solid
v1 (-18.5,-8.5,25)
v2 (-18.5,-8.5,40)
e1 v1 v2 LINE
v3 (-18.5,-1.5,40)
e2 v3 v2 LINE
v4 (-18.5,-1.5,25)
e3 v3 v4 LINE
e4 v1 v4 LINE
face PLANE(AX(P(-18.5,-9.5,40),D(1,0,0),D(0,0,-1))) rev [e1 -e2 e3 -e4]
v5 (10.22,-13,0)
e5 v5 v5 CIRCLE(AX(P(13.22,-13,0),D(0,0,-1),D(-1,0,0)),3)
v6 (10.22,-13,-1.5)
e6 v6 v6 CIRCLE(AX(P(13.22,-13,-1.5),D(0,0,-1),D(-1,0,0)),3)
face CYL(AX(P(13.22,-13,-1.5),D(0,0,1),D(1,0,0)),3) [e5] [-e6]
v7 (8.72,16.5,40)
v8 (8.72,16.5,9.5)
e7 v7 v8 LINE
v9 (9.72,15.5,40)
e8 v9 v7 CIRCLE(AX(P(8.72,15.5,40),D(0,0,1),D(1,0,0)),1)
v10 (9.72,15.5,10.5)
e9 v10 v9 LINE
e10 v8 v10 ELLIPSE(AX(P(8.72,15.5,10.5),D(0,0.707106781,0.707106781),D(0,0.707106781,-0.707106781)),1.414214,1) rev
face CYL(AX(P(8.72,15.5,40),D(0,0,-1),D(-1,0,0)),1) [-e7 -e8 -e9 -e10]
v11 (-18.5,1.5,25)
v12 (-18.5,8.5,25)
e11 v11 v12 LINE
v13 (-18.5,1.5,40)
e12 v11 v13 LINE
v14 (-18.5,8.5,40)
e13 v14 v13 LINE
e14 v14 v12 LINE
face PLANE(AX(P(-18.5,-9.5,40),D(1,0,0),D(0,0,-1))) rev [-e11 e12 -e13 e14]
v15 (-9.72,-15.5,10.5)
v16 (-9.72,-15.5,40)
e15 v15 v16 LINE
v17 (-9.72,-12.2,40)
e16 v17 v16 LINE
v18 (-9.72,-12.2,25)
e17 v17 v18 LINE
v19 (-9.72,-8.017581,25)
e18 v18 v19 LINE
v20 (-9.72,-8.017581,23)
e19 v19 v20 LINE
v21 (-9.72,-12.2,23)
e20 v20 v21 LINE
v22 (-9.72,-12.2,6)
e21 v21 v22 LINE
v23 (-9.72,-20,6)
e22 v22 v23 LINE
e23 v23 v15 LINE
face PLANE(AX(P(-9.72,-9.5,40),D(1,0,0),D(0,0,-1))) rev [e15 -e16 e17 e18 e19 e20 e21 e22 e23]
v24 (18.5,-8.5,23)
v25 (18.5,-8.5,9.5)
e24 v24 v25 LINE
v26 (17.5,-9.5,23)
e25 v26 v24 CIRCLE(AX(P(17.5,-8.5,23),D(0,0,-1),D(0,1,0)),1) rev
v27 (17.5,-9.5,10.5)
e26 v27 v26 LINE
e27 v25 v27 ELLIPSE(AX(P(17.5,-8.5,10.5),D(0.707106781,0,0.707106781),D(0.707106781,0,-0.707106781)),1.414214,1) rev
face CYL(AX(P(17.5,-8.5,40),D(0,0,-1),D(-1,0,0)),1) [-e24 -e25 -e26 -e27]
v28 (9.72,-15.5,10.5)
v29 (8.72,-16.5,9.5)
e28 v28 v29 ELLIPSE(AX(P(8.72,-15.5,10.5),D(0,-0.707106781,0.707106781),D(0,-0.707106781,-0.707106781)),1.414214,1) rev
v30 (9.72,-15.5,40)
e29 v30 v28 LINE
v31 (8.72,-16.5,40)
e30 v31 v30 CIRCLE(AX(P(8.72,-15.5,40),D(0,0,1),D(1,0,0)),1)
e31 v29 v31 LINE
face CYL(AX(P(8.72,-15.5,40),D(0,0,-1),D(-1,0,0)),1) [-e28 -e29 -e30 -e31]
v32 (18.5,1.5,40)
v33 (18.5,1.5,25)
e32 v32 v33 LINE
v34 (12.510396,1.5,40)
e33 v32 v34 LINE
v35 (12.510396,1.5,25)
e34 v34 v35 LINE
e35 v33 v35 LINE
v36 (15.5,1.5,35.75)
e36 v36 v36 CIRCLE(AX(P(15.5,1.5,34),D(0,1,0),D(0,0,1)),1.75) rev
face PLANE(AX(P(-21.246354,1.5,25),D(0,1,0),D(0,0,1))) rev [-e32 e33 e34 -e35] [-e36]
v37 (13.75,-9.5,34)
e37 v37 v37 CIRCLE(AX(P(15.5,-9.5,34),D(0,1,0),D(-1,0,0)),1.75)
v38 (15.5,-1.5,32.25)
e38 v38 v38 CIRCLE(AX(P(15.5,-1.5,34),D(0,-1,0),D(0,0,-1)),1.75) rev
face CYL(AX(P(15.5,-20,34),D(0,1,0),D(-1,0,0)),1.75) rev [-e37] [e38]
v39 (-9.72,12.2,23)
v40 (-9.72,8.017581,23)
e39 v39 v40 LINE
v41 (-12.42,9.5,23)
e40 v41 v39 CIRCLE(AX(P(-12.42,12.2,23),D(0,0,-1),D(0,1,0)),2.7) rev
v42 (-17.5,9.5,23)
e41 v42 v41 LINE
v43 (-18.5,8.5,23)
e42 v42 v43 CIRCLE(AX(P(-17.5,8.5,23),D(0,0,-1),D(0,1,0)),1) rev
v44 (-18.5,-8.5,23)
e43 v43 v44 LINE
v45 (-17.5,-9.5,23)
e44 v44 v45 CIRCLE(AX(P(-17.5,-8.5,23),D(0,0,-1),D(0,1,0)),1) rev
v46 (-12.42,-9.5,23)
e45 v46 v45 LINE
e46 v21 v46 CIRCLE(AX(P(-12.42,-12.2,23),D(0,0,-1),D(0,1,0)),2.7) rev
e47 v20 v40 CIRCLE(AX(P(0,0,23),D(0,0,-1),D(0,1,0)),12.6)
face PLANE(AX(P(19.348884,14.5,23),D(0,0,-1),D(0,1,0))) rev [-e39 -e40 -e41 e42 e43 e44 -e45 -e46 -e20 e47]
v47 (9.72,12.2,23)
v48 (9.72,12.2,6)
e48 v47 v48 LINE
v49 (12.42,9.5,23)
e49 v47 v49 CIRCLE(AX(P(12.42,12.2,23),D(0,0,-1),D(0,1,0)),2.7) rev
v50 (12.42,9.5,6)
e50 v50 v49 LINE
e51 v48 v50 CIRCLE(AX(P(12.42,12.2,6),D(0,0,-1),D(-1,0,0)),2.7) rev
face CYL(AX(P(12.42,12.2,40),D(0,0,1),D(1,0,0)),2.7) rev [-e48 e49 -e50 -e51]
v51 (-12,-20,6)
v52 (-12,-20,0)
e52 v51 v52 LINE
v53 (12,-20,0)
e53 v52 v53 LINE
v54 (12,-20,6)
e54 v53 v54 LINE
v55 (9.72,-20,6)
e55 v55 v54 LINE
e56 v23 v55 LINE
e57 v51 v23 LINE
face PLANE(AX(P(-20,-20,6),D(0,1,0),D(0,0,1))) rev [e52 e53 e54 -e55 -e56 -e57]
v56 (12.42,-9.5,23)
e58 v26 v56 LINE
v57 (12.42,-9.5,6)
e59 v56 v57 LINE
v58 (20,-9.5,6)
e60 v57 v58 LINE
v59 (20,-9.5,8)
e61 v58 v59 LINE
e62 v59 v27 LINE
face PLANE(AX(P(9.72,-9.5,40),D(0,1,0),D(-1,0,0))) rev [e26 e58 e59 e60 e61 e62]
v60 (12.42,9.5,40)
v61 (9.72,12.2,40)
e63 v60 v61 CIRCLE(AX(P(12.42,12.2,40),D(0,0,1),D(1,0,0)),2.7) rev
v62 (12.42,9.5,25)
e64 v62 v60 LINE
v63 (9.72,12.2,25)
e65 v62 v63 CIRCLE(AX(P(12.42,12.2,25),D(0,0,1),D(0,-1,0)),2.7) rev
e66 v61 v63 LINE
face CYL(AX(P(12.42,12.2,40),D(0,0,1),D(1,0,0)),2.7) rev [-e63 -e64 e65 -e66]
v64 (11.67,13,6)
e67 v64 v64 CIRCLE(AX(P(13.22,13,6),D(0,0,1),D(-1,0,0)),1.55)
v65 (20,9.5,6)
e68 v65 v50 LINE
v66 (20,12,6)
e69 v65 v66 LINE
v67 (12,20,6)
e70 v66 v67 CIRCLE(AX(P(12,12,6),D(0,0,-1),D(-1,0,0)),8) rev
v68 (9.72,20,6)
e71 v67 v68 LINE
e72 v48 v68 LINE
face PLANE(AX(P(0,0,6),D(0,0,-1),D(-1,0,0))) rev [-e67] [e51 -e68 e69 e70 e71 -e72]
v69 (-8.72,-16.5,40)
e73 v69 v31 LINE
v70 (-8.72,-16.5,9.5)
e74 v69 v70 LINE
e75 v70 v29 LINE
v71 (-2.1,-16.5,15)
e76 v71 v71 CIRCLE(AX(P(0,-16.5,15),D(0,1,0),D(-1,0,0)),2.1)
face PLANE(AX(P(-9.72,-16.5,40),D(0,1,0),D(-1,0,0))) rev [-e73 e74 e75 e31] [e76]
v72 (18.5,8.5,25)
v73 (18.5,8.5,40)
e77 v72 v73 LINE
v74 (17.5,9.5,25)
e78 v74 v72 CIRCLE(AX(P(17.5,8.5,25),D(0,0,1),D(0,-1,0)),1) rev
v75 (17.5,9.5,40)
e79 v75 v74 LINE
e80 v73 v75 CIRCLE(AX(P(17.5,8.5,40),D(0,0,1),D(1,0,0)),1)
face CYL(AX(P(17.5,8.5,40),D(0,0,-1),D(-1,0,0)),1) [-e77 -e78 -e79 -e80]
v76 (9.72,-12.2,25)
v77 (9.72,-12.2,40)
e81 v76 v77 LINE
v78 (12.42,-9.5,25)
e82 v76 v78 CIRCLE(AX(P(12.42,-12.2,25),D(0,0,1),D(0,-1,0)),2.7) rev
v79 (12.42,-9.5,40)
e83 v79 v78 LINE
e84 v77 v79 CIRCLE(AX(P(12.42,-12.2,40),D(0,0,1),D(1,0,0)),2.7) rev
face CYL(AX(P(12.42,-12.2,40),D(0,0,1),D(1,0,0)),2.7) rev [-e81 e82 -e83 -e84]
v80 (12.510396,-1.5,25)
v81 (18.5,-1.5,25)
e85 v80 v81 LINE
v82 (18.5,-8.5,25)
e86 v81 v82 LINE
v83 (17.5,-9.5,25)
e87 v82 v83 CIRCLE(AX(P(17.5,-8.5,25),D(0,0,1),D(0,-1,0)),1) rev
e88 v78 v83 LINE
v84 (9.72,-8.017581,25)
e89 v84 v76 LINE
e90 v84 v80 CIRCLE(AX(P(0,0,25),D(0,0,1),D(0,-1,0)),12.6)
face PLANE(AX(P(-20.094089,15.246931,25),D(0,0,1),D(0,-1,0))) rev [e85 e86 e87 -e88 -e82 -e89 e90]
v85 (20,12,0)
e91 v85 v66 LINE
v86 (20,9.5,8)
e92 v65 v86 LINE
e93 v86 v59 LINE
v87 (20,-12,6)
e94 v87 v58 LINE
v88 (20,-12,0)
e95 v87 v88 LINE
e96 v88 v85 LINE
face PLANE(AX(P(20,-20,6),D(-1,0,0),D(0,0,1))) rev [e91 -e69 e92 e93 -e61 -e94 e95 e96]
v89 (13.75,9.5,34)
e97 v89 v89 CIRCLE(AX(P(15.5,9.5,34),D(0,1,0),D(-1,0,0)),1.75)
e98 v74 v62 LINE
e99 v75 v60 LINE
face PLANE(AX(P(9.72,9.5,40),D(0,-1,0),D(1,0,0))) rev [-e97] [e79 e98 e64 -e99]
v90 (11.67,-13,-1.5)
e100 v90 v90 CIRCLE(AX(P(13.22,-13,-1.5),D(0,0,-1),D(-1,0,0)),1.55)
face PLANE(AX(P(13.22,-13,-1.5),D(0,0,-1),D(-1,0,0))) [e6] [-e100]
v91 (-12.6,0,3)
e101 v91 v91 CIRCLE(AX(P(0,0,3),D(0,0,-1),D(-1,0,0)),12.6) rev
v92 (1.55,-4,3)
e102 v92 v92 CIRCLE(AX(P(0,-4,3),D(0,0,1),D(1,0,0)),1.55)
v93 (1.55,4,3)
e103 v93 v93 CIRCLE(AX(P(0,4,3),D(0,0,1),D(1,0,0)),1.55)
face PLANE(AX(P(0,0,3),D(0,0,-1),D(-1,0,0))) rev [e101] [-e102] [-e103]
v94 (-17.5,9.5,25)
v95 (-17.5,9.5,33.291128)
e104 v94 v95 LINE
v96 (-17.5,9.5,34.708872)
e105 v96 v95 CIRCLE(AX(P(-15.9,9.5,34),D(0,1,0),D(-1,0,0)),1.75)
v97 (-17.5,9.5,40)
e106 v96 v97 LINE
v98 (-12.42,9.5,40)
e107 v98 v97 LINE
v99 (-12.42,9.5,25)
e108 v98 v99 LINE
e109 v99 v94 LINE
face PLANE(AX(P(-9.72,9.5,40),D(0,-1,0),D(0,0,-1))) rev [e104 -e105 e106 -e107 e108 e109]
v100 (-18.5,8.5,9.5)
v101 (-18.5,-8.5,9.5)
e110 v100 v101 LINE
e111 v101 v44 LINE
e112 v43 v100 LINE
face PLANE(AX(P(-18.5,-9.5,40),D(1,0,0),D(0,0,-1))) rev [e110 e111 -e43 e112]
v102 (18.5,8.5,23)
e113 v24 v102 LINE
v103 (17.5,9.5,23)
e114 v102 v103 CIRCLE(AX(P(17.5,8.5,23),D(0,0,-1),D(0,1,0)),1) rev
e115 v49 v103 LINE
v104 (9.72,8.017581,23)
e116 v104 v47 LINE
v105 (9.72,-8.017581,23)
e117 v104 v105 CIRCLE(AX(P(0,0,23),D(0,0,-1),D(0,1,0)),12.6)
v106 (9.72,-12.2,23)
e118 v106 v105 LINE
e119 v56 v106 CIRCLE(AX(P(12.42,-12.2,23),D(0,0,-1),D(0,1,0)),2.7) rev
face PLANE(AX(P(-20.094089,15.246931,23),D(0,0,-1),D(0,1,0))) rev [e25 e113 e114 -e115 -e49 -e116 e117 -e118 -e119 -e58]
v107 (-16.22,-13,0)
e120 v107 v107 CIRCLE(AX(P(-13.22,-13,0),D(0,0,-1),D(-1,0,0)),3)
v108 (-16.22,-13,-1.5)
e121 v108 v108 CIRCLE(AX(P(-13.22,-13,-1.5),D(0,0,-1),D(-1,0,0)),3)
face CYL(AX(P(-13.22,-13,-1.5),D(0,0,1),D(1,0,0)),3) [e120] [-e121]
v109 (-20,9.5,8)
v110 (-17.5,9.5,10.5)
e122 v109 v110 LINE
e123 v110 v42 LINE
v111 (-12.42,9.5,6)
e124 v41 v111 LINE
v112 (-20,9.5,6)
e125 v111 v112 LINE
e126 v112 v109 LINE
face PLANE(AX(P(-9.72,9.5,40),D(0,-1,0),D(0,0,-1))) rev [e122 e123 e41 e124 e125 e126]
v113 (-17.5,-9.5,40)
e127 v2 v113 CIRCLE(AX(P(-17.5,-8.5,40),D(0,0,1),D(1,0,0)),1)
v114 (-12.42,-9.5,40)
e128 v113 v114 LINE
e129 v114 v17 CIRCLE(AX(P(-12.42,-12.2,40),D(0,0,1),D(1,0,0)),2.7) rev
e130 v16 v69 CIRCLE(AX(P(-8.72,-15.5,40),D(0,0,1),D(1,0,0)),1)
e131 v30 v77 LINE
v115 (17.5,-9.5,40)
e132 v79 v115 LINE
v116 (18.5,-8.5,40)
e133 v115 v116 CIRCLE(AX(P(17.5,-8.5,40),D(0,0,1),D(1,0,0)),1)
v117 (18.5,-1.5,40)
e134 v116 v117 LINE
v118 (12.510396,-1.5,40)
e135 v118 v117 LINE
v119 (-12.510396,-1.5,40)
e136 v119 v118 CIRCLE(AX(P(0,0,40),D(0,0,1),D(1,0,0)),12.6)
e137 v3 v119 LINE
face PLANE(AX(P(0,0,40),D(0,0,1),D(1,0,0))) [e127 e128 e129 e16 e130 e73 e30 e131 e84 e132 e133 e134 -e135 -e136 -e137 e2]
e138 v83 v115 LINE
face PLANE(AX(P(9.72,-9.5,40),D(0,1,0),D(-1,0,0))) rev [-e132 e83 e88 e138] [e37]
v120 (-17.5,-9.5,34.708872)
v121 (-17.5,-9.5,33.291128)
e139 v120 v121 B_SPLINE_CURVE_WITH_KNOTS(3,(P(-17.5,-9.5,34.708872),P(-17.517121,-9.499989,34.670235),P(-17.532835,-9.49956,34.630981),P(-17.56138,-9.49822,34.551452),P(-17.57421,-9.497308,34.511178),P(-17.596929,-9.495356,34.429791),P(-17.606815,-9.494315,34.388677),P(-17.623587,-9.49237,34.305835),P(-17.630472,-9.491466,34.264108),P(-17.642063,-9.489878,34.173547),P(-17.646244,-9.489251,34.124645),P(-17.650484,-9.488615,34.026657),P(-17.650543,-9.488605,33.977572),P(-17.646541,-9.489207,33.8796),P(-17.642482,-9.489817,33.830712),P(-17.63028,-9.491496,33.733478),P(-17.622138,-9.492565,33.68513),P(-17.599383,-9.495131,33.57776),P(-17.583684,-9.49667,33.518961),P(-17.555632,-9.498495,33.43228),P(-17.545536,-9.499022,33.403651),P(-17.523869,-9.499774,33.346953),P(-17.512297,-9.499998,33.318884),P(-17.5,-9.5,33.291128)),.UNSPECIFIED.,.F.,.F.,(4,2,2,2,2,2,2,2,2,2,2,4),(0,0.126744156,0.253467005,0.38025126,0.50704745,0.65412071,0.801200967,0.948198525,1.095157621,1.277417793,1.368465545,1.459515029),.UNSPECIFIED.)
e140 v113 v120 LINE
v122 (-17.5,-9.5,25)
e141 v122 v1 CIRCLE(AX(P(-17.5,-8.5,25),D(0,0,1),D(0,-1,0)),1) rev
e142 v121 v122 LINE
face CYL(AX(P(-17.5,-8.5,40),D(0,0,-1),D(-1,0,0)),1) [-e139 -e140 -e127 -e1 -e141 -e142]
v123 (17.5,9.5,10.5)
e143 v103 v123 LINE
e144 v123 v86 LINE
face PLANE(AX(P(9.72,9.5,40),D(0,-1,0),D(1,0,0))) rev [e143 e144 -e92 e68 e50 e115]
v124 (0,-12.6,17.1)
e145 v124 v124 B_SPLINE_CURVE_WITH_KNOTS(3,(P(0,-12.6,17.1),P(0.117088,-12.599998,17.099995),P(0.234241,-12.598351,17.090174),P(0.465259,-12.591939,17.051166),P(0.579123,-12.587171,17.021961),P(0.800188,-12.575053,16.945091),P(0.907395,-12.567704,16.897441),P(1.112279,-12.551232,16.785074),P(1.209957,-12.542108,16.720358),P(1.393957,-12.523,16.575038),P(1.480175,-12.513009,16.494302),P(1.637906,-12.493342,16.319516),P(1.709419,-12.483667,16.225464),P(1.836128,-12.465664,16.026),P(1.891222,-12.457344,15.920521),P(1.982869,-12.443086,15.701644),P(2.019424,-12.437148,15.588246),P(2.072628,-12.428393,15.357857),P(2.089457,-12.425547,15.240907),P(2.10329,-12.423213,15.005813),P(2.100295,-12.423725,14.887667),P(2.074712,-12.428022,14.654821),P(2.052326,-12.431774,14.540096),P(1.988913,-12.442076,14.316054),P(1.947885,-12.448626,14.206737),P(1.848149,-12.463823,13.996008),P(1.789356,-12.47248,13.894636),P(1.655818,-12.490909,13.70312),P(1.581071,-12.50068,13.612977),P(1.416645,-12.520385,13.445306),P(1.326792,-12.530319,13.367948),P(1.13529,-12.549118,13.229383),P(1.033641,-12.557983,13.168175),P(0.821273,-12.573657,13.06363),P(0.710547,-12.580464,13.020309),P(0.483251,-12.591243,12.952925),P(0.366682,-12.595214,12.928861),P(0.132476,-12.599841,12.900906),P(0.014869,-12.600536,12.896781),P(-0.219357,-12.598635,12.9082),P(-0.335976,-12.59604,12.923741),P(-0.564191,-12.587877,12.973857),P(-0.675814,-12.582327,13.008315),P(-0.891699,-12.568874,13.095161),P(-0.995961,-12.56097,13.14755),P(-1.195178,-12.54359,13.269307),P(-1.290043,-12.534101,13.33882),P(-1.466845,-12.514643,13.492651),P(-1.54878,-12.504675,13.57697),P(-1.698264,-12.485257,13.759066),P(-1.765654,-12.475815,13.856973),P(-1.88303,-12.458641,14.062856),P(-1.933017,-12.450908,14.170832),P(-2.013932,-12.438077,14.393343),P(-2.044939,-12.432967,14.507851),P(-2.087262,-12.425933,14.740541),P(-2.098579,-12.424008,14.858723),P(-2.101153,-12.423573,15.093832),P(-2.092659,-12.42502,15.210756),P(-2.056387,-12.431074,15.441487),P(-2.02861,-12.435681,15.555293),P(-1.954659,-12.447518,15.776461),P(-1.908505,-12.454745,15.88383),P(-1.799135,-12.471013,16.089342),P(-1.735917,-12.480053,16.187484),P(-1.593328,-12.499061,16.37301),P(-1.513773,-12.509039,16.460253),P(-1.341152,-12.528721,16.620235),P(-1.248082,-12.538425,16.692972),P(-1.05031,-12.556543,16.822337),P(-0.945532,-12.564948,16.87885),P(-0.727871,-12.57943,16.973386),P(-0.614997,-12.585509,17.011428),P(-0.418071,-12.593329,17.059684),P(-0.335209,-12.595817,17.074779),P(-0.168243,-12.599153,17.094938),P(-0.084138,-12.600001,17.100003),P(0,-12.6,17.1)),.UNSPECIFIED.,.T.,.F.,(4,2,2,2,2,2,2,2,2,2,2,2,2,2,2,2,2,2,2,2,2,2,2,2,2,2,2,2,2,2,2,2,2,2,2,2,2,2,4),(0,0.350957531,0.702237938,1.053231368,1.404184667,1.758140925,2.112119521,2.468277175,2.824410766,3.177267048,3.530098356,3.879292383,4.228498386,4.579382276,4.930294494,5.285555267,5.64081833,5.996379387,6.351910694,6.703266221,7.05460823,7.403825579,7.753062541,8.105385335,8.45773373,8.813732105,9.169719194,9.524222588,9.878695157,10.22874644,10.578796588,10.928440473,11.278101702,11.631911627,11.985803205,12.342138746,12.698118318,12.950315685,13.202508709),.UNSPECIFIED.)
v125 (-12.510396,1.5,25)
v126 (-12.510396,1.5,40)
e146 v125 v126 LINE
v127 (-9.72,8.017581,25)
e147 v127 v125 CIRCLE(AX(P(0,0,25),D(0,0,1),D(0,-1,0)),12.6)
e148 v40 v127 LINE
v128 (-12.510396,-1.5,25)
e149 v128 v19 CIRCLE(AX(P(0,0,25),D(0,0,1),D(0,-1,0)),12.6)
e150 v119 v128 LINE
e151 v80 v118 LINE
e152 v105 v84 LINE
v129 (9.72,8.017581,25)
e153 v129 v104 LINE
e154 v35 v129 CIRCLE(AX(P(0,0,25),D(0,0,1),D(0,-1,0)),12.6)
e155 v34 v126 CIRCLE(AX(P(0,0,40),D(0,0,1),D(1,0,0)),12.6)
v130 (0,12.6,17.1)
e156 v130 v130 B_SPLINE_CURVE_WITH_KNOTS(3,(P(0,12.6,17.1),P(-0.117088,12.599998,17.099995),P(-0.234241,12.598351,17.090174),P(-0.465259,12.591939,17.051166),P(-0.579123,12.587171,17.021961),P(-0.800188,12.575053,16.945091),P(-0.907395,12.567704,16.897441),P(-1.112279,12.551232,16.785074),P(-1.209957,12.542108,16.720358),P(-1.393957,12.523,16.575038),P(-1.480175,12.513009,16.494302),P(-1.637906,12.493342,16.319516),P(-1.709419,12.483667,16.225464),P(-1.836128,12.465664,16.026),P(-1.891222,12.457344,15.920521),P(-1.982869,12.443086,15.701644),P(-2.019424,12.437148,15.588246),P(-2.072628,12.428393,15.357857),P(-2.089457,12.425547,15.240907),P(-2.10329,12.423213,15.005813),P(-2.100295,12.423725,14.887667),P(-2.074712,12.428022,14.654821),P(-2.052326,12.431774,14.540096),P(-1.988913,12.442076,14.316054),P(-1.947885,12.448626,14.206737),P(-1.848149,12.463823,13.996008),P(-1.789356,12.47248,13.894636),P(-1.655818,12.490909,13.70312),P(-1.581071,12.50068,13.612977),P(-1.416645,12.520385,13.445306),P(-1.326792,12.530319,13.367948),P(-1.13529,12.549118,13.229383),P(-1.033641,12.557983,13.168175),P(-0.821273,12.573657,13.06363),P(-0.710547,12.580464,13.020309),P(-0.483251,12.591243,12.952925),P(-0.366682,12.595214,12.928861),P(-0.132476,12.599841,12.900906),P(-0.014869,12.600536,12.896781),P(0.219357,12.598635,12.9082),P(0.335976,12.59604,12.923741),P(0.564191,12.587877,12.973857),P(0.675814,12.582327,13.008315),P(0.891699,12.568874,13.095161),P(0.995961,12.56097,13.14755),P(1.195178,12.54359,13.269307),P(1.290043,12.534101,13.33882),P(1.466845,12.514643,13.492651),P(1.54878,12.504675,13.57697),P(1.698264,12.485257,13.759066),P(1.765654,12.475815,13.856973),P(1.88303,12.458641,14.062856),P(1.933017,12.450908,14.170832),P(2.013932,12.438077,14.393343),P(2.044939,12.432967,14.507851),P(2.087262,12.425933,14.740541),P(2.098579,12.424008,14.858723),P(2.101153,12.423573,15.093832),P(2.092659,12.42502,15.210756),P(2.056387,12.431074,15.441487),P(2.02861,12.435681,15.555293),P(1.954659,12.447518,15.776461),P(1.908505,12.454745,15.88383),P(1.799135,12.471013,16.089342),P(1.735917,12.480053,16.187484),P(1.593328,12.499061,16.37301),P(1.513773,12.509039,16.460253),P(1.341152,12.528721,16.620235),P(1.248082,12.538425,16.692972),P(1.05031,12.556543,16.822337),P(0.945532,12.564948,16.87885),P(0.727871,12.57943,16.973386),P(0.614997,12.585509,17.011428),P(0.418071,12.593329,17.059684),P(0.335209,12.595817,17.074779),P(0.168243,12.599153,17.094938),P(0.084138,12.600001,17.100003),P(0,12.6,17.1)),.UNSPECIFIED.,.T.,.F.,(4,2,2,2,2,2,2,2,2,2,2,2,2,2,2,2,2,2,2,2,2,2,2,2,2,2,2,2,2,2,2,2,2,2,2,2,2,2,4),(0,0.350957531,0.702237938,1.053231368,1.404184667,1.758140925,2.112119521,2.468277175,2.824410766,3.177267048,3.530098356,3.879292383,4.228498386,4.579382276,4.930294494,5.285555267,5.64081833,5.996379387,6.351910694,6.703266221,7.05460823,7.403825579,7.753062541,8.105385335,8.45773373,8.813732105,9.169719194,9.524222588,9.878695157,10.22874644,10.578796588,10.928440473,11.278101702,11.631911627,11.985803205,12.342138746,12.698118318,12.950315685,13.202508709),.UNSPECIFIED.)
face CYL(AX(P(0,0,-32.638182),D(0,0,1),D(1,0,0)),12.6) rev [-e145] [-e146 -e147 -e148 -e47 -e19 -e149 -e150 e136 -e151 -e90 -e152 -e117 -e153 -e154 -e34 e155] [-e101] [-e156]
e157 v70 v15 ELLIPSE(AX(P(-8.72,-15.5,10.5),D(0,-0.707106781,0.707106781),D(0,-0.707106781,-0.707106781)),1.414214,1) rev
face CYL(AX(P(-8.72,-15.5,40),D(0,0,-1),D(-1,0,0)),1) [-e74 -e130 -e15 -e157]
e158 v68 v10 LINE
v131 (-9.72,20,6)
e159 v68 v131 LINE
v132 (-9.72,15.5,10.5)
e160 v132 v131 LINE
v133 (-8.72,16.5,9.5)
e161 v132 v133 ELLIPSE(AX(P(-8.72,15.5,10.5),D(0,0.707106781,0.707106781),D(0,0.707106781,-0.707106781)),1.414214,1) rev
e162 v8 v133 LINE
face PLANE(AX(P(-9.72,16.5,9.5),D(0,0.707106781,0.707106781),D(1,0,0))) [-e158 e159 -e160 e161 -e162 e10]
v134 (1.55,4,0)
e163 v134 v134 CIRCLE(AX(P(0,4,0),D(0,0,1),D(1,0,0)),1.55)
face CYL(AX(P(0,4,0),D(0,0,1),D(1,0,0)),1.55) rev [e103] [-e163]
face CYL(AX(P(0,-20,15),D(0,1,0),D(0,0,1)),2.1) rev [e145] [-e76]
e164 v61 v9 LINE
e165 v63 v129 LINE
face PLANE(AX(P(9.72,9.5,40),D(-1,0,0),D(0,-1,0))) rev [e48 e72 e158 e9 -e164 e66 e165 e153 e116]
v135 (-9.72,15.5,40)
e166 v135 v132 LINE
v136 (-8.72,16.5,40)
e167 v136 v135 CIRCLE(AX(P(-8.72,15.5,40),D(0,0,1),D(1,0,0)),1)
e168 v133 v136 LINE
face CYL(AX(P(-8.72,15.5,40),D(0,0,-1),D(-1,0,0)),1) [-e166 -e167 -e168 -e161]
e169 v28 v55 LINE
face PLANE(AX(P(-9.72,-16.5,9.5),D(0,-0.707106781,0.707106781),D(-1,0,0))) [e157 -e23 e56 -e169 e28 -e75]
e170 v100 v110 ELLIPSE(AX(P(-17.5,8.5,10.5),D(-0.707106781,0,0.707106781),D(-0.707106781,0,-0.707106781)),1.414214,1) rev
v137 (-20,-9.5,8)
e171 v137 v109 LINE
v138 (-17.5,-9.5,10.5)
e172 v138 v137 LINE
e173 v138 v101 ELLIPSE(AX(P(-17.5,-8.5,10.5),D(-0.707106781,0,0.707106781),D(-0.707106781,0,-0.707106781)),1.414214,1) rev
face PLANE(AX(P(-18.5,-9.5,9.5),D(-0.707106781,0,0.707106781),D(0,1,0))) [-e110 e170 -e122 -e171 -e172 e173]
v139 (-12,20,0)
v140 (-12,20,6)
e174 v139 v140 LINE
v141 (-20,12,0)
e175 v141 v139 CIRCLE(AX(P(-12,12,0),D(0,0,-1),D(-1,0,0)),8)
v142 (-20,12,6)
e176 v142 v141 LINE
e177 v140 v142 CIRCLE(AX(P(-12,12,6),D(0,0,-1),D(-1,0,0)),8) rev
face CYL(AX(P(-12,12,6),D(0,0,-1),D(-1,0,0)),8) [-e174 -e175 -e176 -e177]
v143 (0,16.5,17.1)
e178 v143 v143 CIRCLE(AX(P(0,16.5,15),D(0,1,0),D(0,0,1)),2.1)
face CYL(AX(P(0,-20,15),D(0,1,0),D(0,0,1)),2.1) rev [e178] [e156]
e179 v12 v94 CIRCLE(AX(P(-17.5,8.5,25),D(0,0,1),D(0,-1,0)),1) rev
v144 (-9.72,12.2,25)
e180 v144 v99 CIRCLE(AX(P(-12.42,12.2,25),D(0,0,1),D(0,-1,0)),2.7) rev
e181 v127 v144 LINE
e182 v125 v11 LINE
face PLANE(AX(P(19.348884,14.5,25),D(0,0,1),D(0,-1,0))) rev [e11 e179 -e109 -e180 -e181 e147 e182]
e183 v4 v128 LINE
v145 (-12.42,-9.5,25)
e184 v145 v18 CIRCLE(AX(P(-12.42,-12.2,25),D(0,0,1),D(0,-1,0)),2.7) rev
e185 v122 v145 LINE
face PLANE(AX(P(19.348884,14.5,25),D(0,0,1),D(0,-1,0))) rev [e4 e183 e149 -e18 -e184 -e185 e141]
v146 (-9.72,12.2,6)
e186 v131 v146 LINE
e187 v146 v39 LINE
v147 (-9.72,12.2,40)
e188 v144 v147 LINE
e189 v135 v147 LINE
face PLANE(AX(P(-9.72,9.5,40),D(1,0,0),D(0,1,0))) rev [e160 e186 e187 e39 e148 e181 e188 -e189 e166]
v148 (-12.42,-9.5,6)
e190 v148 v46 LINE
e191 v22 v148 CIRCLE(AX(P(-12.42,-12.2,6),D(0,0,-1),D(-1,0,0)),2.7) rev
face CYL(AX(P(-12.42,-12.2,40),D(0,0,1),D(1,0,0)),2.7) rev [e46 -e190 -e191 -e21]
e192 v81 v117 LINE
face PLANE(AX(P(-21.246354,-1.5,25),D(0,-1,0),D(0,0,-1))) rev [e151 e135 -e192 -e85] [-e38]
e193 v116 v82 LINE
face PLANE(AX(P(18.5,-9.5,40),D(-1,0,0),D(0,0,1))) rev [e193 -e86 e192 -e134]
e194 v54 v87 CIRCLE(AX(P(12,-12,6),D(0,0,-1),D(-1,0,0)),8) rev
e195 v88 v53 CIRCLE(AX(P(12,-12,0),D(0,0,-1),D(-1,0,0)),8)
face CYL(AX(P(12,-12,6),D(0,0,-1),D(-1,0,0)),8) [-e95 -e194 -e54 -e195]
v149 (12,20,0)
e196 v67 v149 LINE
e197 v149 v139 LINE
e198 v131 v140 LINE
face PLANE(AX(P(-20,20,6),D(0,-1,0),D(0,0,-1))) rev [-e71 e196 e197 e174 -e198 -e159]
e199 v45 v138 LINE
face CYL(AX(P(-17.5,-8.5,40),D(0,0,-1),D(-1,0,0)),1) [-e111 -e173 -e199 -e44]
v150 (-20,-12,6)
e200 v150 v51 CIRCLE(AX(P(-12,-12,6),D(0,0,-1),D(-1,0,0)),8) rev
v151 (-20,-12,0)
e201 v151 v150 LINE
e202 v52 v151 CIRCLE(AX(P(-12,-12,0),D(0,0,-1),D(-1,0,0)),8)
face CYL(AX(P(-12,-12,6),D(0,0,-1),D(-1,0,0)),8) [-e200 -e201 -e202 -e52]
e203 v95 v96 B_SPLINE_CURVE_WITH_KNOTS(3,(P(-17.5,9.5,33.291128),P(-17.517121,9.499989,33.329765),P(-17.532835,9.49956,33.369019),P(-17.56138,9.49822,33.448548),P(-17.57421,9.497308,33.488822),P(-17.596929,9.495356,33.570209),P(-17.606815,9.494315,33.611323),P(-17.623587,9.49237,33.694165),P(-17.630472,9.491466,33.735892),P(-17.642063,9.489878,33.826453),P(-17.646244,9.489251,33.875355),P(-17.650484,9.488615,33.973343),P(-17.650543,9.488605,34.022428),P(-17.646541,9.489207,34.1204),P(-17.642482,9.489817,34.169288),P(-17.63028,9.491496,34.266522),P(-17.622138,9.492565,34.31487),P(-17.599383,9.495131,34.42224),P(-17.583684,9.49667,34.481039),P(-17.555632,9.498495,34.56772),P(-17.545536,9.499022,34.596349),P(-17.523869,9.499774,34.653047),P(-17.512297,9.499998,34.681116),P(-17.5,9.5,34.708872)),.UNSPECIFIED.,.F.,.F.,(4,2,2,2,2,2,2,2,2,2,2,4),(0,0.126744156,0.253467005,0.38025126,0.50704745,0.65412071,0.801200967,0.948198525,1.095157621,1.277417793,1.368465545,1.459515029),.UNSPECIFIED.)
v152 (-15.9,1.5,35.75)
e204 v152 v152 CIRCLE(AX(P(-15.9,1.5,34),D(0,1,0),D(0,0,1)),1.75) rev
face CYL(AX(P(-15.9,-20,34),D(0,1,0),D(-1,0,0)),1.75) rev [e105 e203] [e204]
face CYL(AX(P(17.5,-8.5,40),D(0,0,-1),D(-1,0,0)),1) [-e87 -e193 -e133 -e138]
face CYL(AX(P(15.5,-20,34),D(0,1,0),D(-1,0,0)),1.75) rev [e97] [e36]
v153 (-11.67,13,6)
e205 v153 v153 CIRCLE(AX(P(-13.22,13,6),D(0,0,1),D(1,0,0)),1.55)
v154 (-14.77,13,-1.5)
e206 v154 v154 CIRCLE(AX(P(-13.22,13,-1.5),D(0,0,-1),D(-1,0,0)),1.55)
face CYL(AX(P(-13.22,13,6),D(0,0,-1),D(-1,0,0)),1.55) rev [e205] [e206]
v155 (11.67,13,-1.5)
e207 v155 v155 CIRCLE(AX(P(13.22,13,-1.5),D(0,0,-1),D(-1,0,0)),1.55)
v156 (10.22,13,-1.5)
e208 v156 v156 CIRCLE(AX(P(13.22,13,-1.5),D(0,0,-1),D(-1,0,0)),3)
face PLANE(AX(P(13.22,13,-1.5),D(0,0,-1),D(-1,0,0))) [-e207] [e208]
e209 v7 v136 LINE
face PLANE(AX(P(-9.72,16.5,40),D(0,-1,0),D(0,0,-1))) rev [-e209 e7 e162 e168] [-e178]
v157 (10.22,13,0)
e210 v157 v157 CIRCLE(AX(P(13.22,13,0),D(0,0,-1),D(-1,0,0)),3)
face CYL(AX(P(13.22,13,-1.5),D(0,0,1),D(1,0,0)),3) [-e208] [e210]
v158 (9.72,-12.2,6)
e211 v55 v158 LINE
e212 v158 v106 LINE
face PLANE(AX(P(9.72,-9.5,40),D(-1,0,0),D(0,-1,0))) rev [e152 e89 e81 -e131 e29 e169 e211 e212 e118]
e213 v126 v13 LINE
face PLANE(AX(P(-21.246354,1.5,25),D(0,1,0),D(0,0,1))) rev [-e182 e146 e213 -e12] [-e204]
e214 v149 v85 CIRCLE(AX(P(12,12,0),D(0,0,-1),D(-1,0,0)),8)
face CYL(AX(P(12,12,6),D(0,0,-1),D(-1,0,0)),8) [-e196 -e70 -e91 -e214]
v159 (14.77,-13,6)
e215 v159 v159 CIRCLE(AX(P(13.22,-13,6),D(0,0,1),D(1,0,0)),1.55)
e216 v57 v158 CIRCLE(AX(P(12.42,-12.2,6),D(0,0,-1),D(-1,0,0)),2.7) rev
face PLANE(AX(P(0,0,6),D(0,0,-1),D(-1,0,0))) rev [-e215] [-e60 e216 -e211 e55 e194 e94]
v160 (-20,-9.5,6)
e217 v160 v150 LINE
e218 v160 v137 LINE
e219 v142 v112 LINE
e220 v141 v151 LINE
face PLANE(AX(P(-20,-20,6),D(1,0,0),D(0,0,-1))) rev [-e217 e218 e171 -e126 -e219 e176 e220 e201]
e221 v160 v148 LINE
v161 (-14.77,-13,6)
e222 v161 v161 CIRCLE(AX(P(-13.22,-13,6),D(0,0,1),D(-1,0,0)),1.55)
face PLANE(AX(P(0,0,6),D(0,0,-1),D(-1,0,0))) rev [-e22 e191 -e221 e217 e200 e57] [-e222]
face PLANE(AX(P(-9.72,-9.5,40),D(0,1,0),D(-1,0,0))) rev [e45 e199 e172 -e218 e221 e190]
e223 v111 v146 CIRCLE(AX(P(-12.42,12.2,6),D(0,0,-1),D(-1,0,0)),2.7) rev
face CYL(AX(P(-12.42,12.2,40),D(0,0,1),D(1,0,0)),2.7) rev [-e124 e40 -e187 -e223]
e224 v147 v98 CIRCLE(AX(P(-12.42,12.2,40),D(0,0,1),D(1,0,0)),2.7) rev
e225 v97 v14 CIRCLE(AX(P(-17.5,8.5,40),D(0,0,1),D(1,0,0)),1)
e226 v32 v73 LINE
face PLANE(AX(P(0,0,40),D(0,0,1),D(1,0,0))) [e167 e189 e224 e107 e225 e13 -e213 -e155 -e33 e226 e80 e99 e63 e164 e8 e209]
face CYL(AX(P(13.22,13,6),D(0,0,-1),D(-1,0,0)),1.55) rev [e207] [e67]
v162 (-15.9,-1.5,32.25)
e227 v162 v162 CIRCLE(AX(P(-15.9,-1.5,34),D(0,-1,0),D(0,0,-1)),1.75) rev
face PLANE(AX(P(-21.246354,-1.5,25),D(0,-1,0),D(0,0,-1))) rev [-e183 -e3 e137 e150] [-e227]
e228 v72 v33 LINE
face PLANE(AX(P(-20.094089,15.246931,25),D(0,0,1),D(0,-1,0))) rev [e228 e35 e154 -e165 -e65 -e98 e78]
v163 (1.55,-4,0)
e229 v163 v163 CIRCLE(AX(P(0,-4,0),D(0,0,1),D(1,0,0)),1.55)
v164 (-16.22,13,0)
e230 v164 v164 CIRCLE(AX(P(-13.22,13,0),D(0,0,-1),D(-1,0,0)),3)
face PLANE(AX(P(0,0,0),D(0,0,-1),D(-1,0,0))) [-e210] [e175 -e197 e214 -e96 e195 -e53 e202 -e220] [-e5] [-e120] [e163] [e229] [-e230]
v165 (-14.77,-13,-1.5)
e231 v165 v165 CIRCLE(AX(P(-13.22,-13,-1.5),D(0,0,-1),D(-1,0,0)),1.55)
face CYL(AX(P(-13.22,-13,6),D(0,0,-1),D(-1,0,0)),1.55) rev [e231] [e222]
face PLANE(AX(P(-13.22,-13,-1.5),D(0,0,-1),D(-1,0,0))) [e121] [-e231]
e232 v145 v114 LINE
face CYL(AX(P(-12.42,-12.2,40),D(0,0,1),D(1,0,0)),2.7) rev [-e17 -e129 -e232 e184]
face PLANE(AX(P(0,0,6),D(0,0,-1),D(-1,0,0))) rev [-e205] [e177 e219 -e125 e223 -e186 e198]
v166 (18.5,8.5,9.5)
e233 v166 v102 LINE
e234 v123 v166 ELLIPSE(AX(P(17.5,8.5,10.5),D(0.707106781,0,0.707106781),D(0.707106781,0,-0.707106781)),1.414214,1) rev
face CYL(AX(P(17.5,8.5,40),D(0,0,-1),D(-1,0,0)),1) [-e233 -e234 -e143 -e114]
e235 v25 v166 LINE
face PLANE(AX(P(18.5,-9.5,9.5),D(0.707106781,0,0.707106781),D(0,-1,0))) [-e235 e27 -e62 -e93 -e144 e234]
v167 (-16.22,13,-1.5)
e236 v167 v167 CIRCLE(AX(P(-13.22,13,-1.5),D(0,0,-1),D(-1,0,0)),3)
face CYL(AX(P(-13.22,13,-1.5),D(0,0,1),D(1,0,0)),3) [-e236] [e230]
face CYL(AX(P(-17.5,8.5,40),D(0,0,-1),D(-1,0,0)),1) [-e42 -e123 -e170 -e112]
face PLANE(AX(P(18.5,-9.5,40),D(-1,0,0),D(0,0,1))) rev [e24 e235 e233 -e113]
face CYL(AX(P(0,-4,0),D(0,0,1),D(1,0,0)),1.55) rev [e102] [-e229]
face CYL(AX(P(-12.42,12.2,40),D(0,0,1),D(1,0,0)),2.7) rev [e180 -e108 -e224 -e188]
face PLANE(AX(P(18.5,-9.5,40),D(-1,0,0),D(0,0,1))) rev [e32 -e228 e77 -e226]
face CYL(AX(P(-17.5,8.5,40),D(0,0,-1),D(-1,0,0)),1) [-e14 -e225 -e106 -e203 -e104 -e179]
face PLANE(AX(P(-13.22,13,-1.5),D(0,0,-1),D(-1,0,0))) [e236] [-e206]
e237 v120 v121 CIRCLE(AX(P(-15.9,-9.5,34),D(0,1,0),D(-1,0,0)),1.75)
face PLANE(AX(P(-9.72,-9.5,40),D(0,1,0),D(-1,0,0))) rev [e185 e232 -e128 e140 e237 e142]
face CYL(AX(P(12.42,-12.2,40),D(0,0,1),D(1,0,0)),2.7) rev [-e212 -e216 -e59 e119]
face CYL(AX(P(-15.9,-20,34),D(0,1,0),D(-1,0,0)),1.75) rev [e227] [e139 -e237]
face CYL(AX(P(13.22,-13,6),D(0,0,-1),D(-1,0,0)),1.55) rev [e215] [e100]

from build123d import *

# Parameters (mm, degrees)
SKETCH_1_W          = 40
SKETCH_1_H          = 40
SKETCH_1_R          = 1.55
SKETCH_1_R_2        = 12.5
EXTRUDE_1_DEPTH     = 6
SKETCH_2_R          = 12.5
EXTRUDE_2_DEPTH     = 34
SKETCH_4_R          = 1.75
CUT_EXTRUDE_1_DEPTH = 54.574714185
CHAMFER_1_SIZE      = 3.5
CHAMFER_2_SIZE      = 3.5
FILLET_3_R          = 2.7
FILLET_4_R          = 8
SKETCH_5_R          = 12.5
EXTRUDE_3_DEPTH     = 3
SKETCH_6_R          = 1.55
CUT_EXTRUDE_2_DEPTH = 47.572524089
EXTRUDE_START       = 1.5
SKETCH_8_R          = 3
SKETCH_8_R_2        = 1.55
EXTRUDE_4_DEPTH     = 1.5
SKETCH_9_W          = 44.762954336
SKETCH_9_H          = 3
CUT_EXTRUDE_3_DEPTH = 15
CUT_EXTRUDE_4_REACH = 61.011
SKETCH_10_W         = 2
SKETCH_10_H         = 29
SKETCH_11_W         = 2
SKETCH_11_H         = 29.746931438
CUT_EXTRUDE_5_DEPTH = 8.78
FILLET_5_R          = 1
SKETCH_12_R         = 2.1
CUT_EXTRUDE_6_DEPTH = 58.725644284
CUT_EXTRUDE_7_REACH = 52.222
SKETCH_14_R         = 12.6


# Some blends are built 0.0001 mm under size
with BuildPart() as part:
    # 草图1 → 凸台-拉伸1 (new body)
    with BuildSketch(Plane.XY):
        Rectangle(SKETCH_1_W, SKETCH_1_H)
        with Locations((-13.22, 13)):
            Circle(SKETCH_1_R, mode=Mode.SUBTRACT)
        Circle(SKETCH_1_R_2, mode=Mode.SUBTRACT)
        with Locations(Location((13.22, 13, 0), (0, 0, 180))):
            Circle(SKETCH_1_R, mode=Mode.SUBTRACT)
        with Locations((13.22, -13)):
            Circle(SKETCH_1_R, mode=Mode.SUBTRACT)
        with Locations(Location((-13.22, -13, 0), (0, 0, 180))):
            Circle(SKETCH_1_R, mode=Mode.SUBTRACT)
    extrude(amount=EXTRUDE_1_DEPTH)

    # 草图2 → 凸台-拉伸2 (add)
    with BuildSketch(Plane.XY.offset(6)):
        Polygon((-9.72, 9.5), (-9.72, 16.5), (9.72, 16.5), (9.72, 9.5), (18.5, 9.5), (18.5, -9.5), (9.72, -9.5), (9.72, -16.5), (-9.72, -16.5), (-9.72, -9.5), (-18.5, -9.5), (-18.5, 9.5), align=None)
        Circle(SKETCH_2_R, mode=Mode.SUBTRACT)
    extrude(amount=EXTRUDE_2_DEPTH)

    # 草图4 → 切除-拉伸1 (cut, through all)
    with BuildSketch(Plane(origin=(0, 9.5, 0), x_dir=(1, 0, 0), z_dir=(0, 1, 0))):
        with Locations(Location((-15.9, -34, 0), (0, 0, 180))):
            Circle(SKETCH_4_R)
        with Locations(Location((15.5, -34, 0), (0, 0, 180))):
            Circle(SKETCH_4_R)
    extrude(amount=-CUT_EXTRUDE_1_DEPTH, mode=Mode.SUBTRACT)

    # 倒角1
    chamfer_1_edges = [part.edges().sort_by_distance(p)[0] for p in [
        (0, 16.5, 6),
        (0, -16.5, 6),
    ]]
    chamfer(chamfer_1_edges, length=CHAMFER_1_SIZE - 0.0001)  # a hair under: the kernel refuses the full size

    # 倒角2
    # the kernel refuses this chamfer: 3.5 mm, written as the material it adds along each edge
    with BuildSketch(Plane(origin=(-18.5, -9.5, 6), x_dir=(-0.9996219169112968, 0, -0.027495876610586372), z_dir=(0, 1, 0))) as chamfer_2_piece_1_section:
        Polygon((CHAMFER_2_SIZE * 0.999621916911, CHAMFER_2_SIZE * 0.0274958766106), (-CHAMFER_2_SIZE * 0.0274958766106, CHAMFER_2_SIZE * 0.999621916911), (0, 0), align=None)
    chamfer_2_piece_1 = extrude(amount=19, mode=Mode.PRIVATE)
    chamfer_2_piece_1 = split(chamfer_2_piece_1, bisect_by=Plane(origin=(-20, 0, 7.427398354), z_dir=(1, 0, 0)), keep=Keep.TOP, mode=Mode.PRIVATE)
    add(chamfer_2_piece_1)
    with BuildSketch(Plane(origin=(18.5, 9.5, 6), x_dir=(0.9996219169112968, 0, -0.027495876610586372), z_dir=(0, -1, 0))) as chamfer_2_piece_2_section:
        Polygon((CHAMFER_2_SIZE * 0.999621916911, CHAMFER_2_SIZE * 0.0274958766106), (-CHAMFER_2_SIZE * 0.0274958766106, CHAMFER_2_SIZE * 0.999621916911), (0, 0), align=None)
    chamfer_2_piece_2 = extrude(amount=19, mode=Mode.PRIVATE)
    chamfer_2_piece_2 = split(chamfer_2_piece_2, bisect_by=Plane(origin=(20, 0, 7.427398354), z_dir=(-1, 0, 0)), keep=Keep.TOP, mode=Mode.PRIVATE)
    add(chamfer_2_piece_2)

    # 圆角3
    fillet_3_edges = [part.edges().sort_by_distance(p)[0] for p in [
        (9.72, 9.5, 23),
        (-9.72, 9.5, 23),
        (-9.72, -9.5, 23),
        (9.72, -9.5, 23),
    ]]
    fillet(fillet_3_edges, radius=FILLET_3_R)

    # 圆角4
    fillet_4_edges = [part.edges().sort_by_distance(p)[0] for p in [
        (20, -20, 3),
        (-20, -20, 3),
        (-20, 20, 3),
        (20, 20, 3),
    ]]
    fillet(fillet_4_edges, radius=FILLET_4_R)

    # 草图5 → 凸台-拉伸3 (add)
    with BuildSketch(Plane(origin=(0, 0, 0), x_dir=(-1, 0, 0), z_dir=(0, 0, -1))):
        Circle(SKETCH_5_R)
    extrude(amount=-EXTRUDE_3_DEPTH)

    # 草图6 → 切除-拉伸2 (cut, through all)
    with BuildSketch(Plane.XY.offset(3)):
        with Locations((0, 4)):
            Circle(SKETCH_6_R)
        with Locations((0, -4)):
            Circle(SKETCH_6_R)
    extrude(amount=-CUT_EXTRUDE_2_DEPTH, mode=Mode.SUBTRACT)

    # 草图8 → 凸台-拉伸4 (add)
    # profile 1 of 4: a face of its own
    with BuildSketch(Plane(origin=(0, 0, 0), x_dir=(-1, 0, 0), z_dir=(0, 0, -1)).offset(EXTRUDE_START)):
        with Locations((-13.22, 13)):
            Circle(SKETCH_8_R)
        with Locations((-13.22, 13)):
            Circle(SKETCH_8_R_2, mode=Mode.SUBTRACT)
    # profile 2 of 4: a face of its own
    with BuildSketch(Plane(origin=(0, 0, 0), x_dir=(-1, 0, 0), z_dir=(0, 0, -1)).offset(EXTRUDE_START)):
        with Locations((13.22, 13)):
            Circle(SKETCH_8_R)
        with Locations((13.22, 13)):
            Circle(SKETCH_8_R_2, mode=Mode.SUBTRACT)
    # profile 3 of 4: a face of its own
    with BuildSketch(Plane(origin=(0, 0, 0), x_dir=(-1, 0, 0), z_dir=(0, 0, -1)).offset(EXTRUDE_START)):
        with Locations((-13.22, -13)):
            Circle(SKETCH_8_R)
        with Locations((-13.22, -13)):
            Circle(SKETCH_8_R_2, mode=Mode.SUBTRACT)
    # profile 4 of 4: a face of its own
    with BuildSketch(Plane(origin=(0, 0, 0), x_dir=(-1, 0, 0), z_dir=(0, 0, -1)).offset(EXTRUDE_START)):
        with Locations((13.22, -13)):
            Circle(SKETCH_8_R)
        with Locations((13.22, -13)):
            Circle(SKETCH_8_R_2, mode=Mode.SUBTRACT)
    extrude(amount=-EXTRUDE_4_DEPTH)

    # 草图9 → 切除-拉伸3 (cut)
    with BuildSketch(Plane.XY.offset(40)):
        with Locations((1.135123066, 0)):
            Rectangle(SKETCH_9_W, SKETCH_9_H)
    extrude(amount=-CUT_EXTRUDE_3_DEPTH, mode=Mode.SUBTRACT)

    # 切除-拉伸4: up to this face of the body (flat: up to its plane)
    cut_extrude_4_end = Plane(part.part.faces().sort_by_distance((-9.72, 14.483354768, 22.363374022))[0])
    # 草图10 → 切除-拉伸4 (cut, up to the picked face)
    with BuildSketch(Plane.ZY.offset(18.5), mode=Mode.PRIVATE) as cut_extrude_4_sk1:
        with Locations((24, 0)):
            Rectangle(SKETCH_10_W, SKETCH_10_H)
    cut_extrude_4_tool1 = split(extrude(cut_extrude_4_sk1.sketch, amount=-CUT_EXTRUDE_4_REACH, mode=Mode.PRIVATE), bisect_by=cut_extrude_4_end, keep=Keep.BOTH, mode=Mode.PRIVATE)
    add(cut_extrude_4_tool1.solids().sort_by(Axis((-18.5, 0, 24), (1, 0, 0)))[0], mode=Mode.SUBTRACT)

    # 草图11 → 切除-拉伸5 (cut)
    with BuildSketch(Plane(origin=(18.5, 0, 0), x_dir=(0, 0, -1), z_dir=(1, 0, 0))):
        with Locations((-24, 0.373465719)):
            Rectangle(SKETCH_11_W, SKETCH_11_H)
    extrude(amount=-CUT_EXTRUDE_5_DEPTH, mode=Mode.SUBTRACT)

    # 圆角5
    # the kernel refuses this fillet: 1 mm, written as the material it takes off along each edge
    with BuildSketch(Plane(origin=(-18.5, -9.5, 7), x_dir=(1, 0, 0), z_dir=(0, 0, 1))) as fillet_5_piece_1_section:
        with BuildLine():
            CenterArc((FILLET_5_R, FILLET_5_R), FILLET_5_R, 180, 90)
            Line((0, FILLET_5_R), (0, 0))
            Line((0, 0), (FILLET_5_R, 0))
        make_face()
    fillet_5_piece_1 = extrude(amount=18.5, mode=Mode.PRIVATE)
    fillet_5_piece_1 = split(fillet_5_piece_1, bisect_by=Plane(origin=(-14.332413526, -9.271864211, 13.667586474), z_dir=(-0.7071067811868302, 0, 0.7071067811862649)), keep=Keep.TOP, mode=Mode.PRIVATE)
    add(fillet_5_piece_1, mode=Mode.SUBTRACT)
    with BuildSketch(Plane(origin=(-18.5, 9.5, 7), x_dir=(1, 0, 0), z_dir=(0, 0, 1))) as fillet_5_piece_2_section:
        with BuildLine():
            CenterArc((FILLET_5_R, -FILLET_5_R), FILLET_5_R, 90, 90)
            Line((0, -FILLET_5_R), (0, 0))
            Line((0, 0), (FILLET_5_R, 0))
        make_face()
    fillet_5_piece_2 = extrude(amount=18.5, mode=Mode.PRIVATE)
    fillet_5_piece_2 = split(fillet_5_piece_2, bisect_by=Plane(origin=(-14.332413526, 9.271864211, 13.667586474), z_dir=(-0.7071067811868302, 0, 0.7071067811862649)), keep=Keep.TOP, mode=Mode.PRIVATE)
    add(fillet_5_piece_2, mode=Mode.SUBTRACT)
    with BuildSketch(Plane(origin=(18.5, -9.5, 7), x_dir=(-1, 0, 0), z_dir=(0, 0, 1))) as fillet_5_piece_3_section:
        with BuildLine():
            CenterArc((FILLET_5_R, -FILLET_5_R), FILLET_5_R, 90, 90)
            Line((0, -FILLET_5_R), (0, 0))
            Line((0, 0), (FILLET_5_R, 0))
        make_face()
    fillet_5_piece_3 = extrude(amount=18.5, mode=Mode.PRIVATE)
    fillet_5_piece_3 = split(fillet_5_piece_3, bisect_by=Plane(origin=(14.332413526, -9.271864211, 13.667586474), z_dir=(0.7071067811868302, 0, 0.7071067811862649)), keep=Keep.TOP, mode=Mode.PRIVATE)
    add(fillet_5_piece_3, mode=Mode.SUBTRACT)
    with BuildSketch(Plane(origin=(18.5, 9.5, 7), x_dir=(-1, 0, 0), z_dir=(0, 0, 1))) as fillet_5_piece_4_section:
        with BuildLine():
            CenterArc((FILLET_5_R, FILLET_5_R), FILLET_5_R, 180, 90)
            Line((0, FILLET_5_R), (0, 0))
            Line((0, 0), (FILLET_5_R, 0))
        make_face()
    fillet_5_piece_4 = extrude(amount=18.5, mode=Mode.PRIVATE)
    fillet_5_piece_4 = split(fillet_5_piece_4, bisect_by=Plane(origin=(14.332413526, 9.271864211, 13.667586474), z_dir=(0.7071067811868302, 0, 0.7071067811862649)), keep=Keep.TOP, mode=Mode.PRIVATE)
    add(fillet_5_piece_4, mode=Mode.SUBTRACT)
    with BuildSketch(Plane(origin=(18.5, 9.5, 22.5), x_dir=(0, -1, 0), z_dir=(0, 0, 1)), Plane(origin=(-18.5, -9.5, 22.5), x_dir=(0, 1, 0), z_dir=(0, 0, 1)), Plane(origin=(18.5, -9.5, 22.5), x_dir=(-1, 0, 0), z_dir=(0, 0, 1))) as fillet_5_piece_5:
        with BuildLine():
            CenterArc((FILLET_5_R, -FILLET_5_R), FILLET_5_R, 90, 90)
            Line((0, -FILLET_5_R), (0, 0))
            Line((0, 0), (FILLET_5_R, 0))
        make_face()
    extrude(amount=20, mode=Mode.SUBTRACT)
    with BuildSketch(Plane(origin=(9.72, 16.5, 6.9999), x_dir=(0, -1, 0), z_dir=(0, 0, 1))) as fillet_5_piece_6_section:
        with BuildLine():
            CenterArc((FILLET_5_R, -FILLET_5_R), FILLET_5_R, 90, 90)
            Line((0, -FILLET_5_R), (0, 0))
            Line((0, 0), (FILLET_5_R, 0))
        make_face()
    fillet_5_piece_6 = extrude(amount=35.5001, mode=Mode.PRIVATE)
    fillet_5_piece_6 = split(fillet_5_piece_6, bisect_by=Plane(origin=(9.492767119, 8.081242245, 17.918657755), z_dir=(0, 0.7071067811865476, 0.7071067811865476)), keep=Keep.TOP, mode=Mode.PRIVATE)
    add(fillet_5_piece_6, mode=Mode.SUBTRACT)
    with BuildSketch(Plane(origin=(-9.72, 16.5, 6.9999), x_dir=(0, -1, 0), z_dir=(0, 0, 1))) as fillet_5_piece_7_section:
        with BuildLine():
            CenterArc((FILLET_5_R, FILLET_5_R), FILLET_5_R, 180, 90)
            Line((0, FILLET_5_R), (0, 0))
            Line((0, 0), (FILLET_5_R, 0))
        make_face()
    fillet_5_piece_7 = extrude(amount=35.5001, mode=Mode.PRIVATE)
    fillet_5_piece_7 = split(fillet_5_piece_7, bisect_by=Plane(origin=(-9.492767119, 8.081242245, 17.918657755), z_dir=(0, 0.7071067811865476, 0.7071067811865476)), keep=Keep.TOP, mode=Mode.PRIVATE)
    add(fillet_5_piece_7, mode=Mode.SUBTRACT)
    with BuildSketch(Plane(origin=(-18.5, 9.5, 22.5), x_dir=(0, -1, 0), z_dir=(0, 0, 1))) as fillet_5_piece_8:
        with BuildLine():
            CenterArc((FILLET_5_R, FILLET_5_R), FILLET_5_R, 180, 90)
            Line((0, FILLET_5_R), (0, 0))
            Line((0, 0), (FILLET_5_R, 0))
        make_face()
    extrude(amount=20, mode=Mode.SUBTRACT)
    with BuildSketch(Plane(origin=(-9.72, -16.5, 6.9999), x_dir=(0, 1, 0), z_dir=(0, 0, 1))) as fillet_5_piece_9_section:
        with BuildLine():
            CenterArc((FILLET_5_R, -FILLET_5_R), FILLET_5_R, 90, 90)
            Line((0, -FILLET_5_R), (0, 0))
            Line((0, 0), (FILLET_5_R, 0))
        make_face()
    fillet_5_piece_9 = extrude(amount=35.5001, mode=Mode.PRIVATE)
    fillet_5_piece_9 = split(fillet_5_piece_9, bisect_by=Plane(origin=(-9.492767119, -8.081242245, 17.918657755), z_dir=(0, -0.7071067811865476, 0.7071067811865476)), keep=Keep.TOP, mode=Mode.PRIVATE)
    add(fillet_5_piece_9, mode=Mode.SUBTRACT)
    with BuildSketch(Plane(origin=(9.72, -16.5, 6.9999), x_dir=(0, 1, 0), z_dir=(0, 0, 1))) as fillet_5_piece_10_section:
        with BuildLine():
            CenterArc((FILLET_5_R, FILLET_5_R), FILLET_5_R, 180, 90)
            Line((0, FILLET_5_R), (0, 0))
            Line((0, 0), (FILLET_5_R, 0))
        make_face()
    fillet_5_piece_10 = extrude(amount=35.5001, mode=Mode.PRIVATE)
    fillet_5_piece_10 = split(fillet_5_piece_10, bisect_by=Plane(origin=(9.492767119, -8.081242245, 17.918657755), z_dir=(0, -0.7071067811865476, 0.7071067811865476)), keep=Keep.TOP, mode=Mode.PRIVATE)
    add(fillet_5_piece_10, mode=Mode.SUBTRACT)

    # 草图12 → 切除-拉伸6 (cut, through all)
    with BuildSketch(Plane(origin=(0, 16.5, 0), x_dir=(1, 0, 0), z_dir=(0, 1, 0))):
        with Locations(Location((0, -15, 0), (0, 0, 270))):
            Circle(SKETCH_12_R)
    extrude(amount=-CUT_EXTRUDE_6_DEPTH, mode=Mode.SUBTRACT)

    # 切除-拉伸7: up to this face of the body (flat: up to its plane)
    cut_extrude_7_end = Plane(part.part.faces().sort_by_distance((0, 0, 3))[0])
    # 草图14 → 切除-拉伸7 (cut, up to the picked face)
    with BuildSketch(Plane.XY.offset(40), mode=Mode.PRIVATE) as cut_extrude_7_sk1:
        with Locations(Location((0, 0, 0), (0, 0, 6.837141168))):
            Circle(SKETCH_14_R)
    cut_extrude_7_tool1 = split(extrude(cut_extrude_7_sk1.sketch, amount=-CUT_EXTRUDE_7_REACH, mode=Mode.PRIVATE), bisect_by=cut_extrude_7_end, keep=Keep.BOTH, mode=Mode.PRIVATE)
    add(cut_extrude_7_tool1.solids().sort_by(Axis((0, 0, 40), (0, 0, -1)))[0], mode=Mode.SUBTRACT)


solid = part.part
